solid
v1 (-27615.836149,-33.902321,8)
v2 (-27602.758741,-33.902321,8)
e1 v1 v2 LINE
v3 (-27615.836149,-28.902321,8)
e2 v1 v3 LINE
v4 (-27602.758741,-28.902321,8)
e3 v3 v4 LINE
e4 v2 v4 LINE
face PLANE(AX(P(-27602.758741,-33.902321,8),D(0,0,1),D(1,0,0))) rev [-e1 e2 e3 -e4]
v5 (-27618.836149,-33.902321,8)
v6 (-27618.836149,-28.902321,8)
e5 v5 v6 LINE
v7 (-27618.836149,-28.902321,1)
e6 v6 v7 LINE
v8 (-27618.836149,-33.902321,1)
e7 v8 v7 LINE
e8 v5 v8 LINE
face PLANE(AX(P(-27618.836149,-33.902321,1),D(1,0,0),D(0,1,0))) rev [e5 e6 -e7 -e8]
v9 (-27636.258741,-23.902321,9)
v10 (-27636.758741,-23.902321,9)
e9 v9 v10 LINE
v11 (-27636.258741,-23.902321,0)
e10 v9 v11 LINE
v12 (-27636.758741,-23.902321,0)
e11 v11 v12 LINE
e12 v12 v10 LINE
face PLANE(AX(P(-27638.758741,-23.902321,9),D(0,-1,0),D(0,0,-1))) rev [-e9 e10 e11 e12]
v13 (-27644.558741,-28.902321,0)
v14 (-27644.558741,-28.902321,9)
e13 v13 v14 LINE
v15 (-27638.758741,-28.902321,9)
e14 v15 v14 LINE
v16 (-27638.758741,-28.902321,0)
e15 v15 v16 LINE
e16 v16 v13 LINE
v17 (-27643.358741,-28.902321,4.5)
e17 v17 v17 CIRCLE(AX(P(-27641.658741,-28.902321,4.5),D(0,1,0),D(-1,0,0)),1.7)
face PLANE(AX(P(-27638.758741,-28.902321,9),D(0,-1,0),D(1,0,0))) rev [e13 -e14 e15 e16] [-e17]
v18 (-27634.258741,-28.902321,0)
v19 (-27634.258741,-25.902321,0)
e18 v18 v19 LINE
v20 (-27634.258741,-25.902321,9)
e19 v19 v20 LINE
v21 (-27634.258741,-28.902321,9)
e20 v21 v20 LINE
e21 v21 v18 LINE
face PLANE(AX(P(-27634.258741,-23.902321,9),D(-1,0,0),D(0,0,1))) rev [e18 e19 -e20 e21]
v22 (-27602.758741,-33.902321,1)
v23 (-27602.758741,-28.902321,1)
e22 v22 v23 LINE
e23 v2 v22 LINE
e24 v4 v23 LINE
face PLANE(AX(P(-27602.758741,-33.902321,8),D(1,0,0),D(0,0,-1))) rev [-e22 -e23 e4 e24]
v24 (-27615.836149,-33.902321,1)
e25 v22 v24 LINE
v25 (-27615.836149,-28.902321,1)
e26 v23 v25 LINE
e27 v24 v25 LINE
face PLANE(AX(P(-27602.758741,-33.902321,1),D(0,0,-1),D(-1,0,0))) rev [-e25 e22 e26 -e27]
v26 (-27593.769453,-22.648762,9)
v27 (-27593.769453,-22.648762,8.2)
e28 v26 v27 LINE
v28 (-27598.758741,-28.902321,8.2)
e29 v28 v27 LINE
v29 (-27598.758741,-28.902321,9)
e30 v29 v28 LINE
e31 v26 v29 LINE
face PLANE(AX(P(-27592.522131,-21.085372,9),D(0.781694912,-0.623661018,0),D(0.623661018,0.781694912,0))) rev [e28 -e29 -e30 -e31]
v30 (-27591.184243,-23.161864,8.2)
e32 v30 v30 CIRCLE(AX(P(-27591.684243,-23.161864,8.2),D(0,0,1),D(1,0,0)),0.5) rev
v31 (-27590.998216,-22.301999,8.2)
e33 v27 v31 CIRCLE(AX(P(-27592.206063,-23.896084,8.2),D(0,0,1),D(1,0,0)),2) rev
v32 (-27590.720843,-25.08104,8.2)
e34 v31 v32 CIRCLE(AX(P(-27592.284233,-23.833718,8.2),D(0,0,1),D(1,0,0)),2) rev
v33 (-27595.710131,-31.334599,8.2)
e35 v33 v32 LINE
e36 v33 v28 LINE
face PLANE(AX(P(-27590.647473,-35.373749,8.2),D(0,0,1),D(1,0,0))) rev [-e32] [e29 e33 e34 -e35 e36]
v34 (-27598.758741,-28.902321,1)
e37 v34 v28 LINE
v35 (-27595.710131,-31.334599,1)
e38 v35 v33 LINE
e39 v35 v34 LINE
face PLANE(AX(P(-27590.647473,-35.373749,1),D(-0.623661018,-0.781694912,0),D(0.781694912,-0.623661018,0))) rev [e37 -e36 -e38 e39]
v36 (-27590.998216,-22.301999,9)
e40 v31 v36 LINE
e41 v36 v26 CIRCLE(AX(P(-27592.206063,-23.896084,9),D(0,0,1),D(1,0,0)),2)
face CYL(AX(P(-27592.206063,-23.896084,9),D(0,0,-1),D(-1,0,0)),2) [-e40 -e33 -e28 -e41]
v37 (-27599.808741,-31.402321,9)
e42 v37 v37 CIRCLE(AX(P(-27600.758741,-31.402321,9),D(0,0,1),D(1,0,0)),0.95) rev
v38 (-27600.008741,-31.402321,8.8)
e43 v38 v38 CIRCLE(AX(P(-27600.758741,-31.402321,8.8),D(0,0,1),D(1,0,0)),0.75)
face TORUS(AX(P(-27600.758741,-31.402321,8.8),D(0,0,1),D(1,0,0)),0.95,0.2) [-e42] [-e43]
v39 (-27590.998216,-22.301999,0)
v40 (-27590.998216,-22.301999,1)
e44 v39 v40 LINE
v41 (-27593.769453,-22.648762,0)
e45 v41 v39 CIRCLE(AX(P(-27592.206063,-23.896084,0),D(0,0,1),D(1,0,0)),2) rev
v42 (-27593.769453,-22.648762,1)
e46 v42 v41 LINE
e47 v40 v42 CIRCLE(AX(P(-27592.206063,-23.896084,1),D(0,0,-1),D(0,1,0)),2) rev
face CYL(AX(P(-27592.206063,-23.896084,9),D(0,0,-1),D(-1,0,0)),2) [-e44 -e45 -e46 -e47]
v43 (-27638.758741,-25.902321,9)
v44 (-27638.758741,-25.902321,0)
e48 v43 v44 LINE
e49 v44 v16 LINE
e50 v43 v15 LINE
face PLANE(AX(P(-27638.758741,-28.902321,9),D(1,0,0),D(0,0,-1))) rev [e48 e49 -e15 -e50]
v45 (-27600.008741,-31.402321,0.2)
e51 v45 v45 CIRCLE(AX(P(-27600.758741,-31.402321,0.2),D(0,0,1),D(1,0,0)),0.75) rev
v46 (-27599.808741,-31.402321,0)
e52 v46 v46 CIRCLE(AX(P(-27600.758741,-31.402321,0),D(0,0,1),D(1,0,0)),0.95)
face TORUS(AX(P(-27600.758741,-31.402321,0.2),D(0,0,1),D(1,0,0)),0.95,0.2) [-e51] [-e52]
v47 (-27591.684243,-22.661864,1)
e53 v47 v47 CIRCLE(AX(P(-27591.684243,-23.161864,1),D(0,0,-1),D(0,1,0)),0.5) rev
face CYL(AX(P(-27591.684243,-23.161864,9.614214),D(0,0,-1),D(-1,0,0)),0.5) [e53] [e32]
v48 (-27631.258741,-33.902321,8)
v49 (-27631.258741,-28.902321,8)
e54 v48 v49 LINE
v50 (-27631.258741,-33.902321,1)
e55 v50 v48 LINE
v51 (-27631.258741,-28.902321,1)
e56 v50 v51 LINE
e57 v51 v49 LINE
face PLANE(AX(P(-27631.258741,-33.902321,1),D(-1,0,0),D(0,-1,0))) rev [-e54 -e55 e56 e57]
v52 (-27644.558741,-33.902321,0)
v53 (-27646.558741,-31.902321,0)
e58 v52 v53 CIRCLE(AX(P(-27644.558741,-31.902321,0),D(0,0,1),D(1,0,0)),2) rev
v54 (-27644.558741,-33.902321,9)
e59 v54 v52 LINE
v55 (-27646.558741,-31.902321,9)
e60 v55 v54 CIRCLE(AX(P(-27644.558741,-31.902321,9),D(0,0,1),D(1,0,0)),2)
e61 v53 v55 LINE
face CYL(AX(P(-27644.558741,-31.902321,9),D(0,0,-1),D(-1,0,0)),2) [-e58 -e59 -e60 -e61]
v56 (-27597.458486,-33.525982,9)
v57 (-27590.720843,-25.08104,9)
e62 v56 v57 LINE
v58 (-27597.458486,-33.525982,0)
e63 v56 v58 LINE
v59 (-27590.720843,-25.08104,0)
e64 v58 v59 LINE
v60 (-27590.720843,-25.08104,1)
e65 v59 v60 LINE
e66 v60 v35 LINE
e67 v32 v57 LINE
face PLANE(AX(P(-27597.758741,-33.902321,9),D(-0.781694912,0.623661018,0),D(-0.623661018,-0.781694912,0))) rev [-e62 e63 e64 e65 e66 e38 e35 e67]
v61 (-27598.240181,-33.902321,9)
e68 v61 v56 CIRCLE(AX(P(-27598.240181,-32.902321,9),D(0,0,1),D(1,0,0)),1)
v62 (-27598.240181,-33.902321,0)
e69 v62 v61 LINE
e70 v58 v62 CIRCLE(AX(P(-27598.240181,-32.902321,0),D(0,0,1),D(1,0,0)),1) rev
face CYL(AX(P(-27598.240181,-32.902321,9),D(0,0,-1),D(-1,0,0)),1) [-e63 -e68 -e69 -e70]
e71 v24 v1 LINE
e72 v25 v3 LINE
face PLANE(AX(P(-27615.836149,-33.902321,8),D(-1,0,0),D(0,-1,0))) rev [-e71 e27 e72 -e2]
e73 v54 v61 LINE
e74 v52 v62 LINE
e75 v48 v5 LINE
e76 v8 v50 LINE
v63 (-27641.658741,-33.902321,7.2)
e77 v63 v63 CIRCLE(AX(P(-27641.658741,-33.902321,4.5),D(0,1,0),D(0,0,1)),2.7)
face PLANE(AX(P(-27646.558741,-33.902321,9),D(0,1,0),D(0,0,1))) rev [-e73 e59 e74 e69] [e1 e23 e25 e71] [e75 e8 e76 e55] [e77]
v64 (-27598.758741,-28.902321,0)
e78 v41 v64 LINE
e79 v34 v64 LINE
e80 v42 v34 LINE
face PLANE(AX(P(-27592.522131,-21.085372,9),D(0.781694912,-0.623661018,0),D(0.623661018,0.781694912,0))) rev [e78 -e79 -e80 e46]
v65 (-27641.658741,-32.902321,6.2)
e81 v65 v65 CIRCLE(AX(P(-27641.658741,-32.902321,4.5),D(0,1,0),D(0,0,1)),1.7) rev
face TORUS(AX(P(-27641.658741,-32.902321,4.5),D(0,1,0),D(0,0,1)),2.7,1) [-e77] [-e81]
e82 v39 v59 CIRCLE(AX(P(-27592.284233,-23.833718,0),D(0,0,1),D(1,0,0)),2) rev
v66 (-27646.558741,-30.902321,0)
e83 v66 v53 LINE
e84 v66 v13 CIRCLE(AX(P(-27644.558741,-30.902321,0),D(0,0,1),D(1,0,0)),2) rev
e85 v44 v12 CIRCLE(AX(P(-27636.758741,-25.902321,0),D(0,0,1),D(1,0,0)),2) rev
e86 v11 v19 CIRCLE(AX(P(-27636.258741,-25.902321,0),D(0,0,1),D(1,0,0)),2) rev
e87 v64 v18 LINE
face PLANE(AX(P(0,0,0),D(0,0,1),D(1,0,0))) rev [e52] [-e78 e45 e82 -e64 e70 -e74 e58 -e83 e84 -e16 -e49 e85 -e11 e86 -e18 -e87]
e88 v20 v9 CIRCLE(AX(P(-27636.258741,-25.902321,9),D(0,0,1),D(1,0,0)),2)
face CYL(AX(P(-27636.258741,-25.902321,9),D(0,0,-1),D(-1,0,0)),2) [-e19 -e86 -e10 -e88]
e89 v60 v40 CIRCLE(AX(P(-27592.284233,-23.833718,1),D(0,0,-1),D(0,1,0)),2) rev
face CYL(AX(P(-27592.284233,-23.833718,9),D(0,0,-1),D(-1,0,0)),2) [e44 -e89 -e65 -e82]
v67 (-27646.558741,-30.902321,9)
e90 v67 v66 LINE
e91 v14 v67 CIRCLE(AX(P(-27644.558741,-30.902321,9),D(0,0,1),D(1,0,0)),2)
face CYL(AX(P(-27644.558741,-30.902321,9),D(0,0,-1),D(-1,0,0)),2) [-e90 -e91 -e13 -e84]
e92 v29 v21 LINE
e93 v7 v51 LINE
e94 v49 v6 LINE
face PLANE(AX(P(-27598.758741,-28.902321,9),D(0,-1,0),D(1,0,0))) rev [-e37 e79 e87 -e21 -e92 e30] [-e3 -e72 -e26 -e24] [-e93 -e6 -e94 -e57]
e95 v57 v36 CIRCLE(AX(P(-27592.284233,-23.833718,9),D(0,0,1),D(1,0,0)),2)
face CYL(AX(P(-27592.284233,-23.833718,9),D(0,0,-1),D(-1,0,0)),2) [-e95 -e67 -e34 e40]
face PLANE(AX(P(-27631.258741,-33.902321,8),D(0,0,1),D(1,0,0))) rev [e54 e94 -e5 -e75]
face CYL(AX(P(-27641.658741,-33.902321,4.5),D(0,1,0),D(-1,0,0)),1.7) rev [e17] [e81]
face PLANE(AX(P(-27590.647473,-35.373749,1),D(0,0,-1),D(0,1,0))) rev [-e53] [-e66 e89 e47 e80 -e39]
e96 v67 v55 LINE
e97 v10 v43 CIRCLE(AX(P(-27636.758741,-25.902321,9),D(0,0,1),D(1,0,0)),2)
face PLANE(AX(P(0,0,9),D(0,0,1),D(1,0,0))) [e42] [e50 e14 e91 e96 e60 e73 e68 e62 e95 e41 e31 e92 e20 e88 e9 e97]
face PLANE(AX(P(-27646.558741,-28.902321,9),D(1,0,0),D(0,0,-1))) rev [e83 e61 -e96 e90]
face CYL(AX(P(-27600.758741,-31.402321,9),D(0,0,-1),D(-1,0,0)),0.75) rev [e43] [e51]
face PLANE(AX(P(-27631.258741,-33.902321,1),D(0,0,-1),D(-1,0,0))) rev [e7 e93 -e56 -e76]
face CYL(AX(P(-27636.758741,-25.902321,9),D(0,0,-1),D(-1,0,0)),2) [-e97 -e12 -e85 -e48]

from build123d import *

# Parameters (mm, degrees)
SZKIC1_R                    = 0.75
DODANIE_WYCI_GNI_CIE1_DEPTH = 9
ZAOKR_GLENIE1_R             = 2
ZAOKR_GLENIE3_R             = 1
SZKIC2_R                    = 1.7
WYTNIJ_WYCI_GNI_CIE1_DEPTH  = 27647.561311418
SZKIC3_W                    = 13.077407628
SZKIC3_H                    = 7
SZKIC3_W_2                  = 12.422592372
WYTNIJ_WYCI_GNI_CIE2_DEPTH  = 27647.561311418
SZKIC4_W                    = 7.2
SZKIC4_H                    = 12.770373744
WYTNIJ_WYCI_GNI_CIE3_DEPTH  = 17269.61853488
ZAOKR_GLENIE4_R             = 2
ZAOKR_GLENIE5_R             = 1
ZAOKR_GLENIE7_R             = 0.2
DODANIE_WYCI_GNI_CIE3_DEPTH = 7.2


with BuildPart() as part:
    # Szkic1 → Dodanie-wyciągnięcie1 (new body)
    with BuildSketch(Plane.XY):
        Polygon((-27646.558741393, -28.902320952), (-27646.558741393, -33.902320952), (-27597.758741393, -33.902320952), (-27589.47352106, -23.517649804), (-27592.522131216, -21.085371835), (-27598.758741393, -28.902320952), (-27634.258741393, -28.902320952), (-27634.258741393, -23.902320952), (-27638.758741393, -23.902320952), (-27638.758741393, -28.902320952), align=None)
        with Locations((-27600.758741393, -31.402320952)):
            Circle(SZKIC1_R, mode=Mode.SUBTRACT)
    extrude(amount=DODANIE_WYCI_GNI_CIE1_DEPTH)

    # Zaokrąglenie1
    zaokr_glenie1_edges = [part.edges().sort_by_distance(p)[0] for p in [
        (-27638.758741393, -23.902320952, 4.5),
        (-27634.258741393, -23.902320952, 4.5),
        (-27646.558741393, -33.902320952, 4.5),
        (-27646.558741393, -28.902320952, 4.5),
    ]]
    fillet(zaokr_glenie1_edges, radius=ZAOKR_GLENIE1_R)

    # Zaokrąglenie3
    zaokr_glenie3_edges = [part.edges().sort_by_distance(p)[0] for p in [
        (-27597.758741393, -33.902320952, 4.5),
    ]]
    fillet(zaokr_glenie3_edges, radius=ZAOKR_GLENIE3_R)

    # Szkic2 → Wytnij-wyciągnięcie1 (cut, through all)
    with BuildSketch(Plane(origin=(0, -28.902320952, 0), x_dir=(1, 0, 0), z_dir=(0, 1, 0))):
        with Locations(Location((-27641.658741393, -4.5, 0), (0, 0, 180))):
            Circle(SZKIC2_R)
    extrude(amount=-WYTNIJ_WYCI_GNI_CIE1_DEPTH, mode=Mode.SUBTRACT)

    # Szkic3 → Wytnij-wyciągnięcie2 (cut, through all)
    with BuildSketch(Plane(origin=(0, -28.902320952, 0), x_dir=(1, 0, 0), z_dir=(0, 1, 0))):
        with Locations((-27609.297445207, -4.5)):
            Rectangle(SZKIC3_W, SZKIC3_H)
        with Locations((-27625.047445207, -4.5)):
            Rectangle(SZKIC3_W_2, SZKIC3_H)
    extrude(amount=-WYTNIJ_WYCI_GNI_CIE2_DEPTH, mode=Mode.SUBTRACT)

    # Szkic4 → Wytnij-wyciągnięcie3 (cut, through all)
    with BuildSketch(Plane(origin=(-16850.04669364, 13443.502203136, 0), x_dir=(0, 0, 1), z_dir=(-0.7816949117558672, 0.6236610176490005, 0))):
        with Locations((4.6, -17228.477572842)):
            Rectangle(SZKIC4_W, SZKIC4_H)
    extrude(amount=-WYTNIJ_WYCI_GNI_CIE3_DEPTH, mode=Mode.SUBTRACT)

    # Zaokrąglenie4
    # the kernel refuses this fillet: 2 mm, written as the material it takes off along each edge
    with BuildSketch(Plane(origin=(-27589.47352106, -23.517649804, -5), x_dir=(-0.6236610176488676, -0.7816949117559733, 0), z_dir=(0, 0, 1)), Plane(origin=(-27592.522131216, -21.085371835, -5), x_dir=(0.78169491175572, -0.623661017649185, 0), z_dir=(0, 0, 1))) as zaokr_glenie4_piece_1:
        with BuildLine():
            CenterArc((ZAOKR_GLENIE4_R, -ZAOKR_GLENIE4_R), ZAOKR_GLENIE4_R, 90, 90)
            Line((0, -ZAOKR_GLENIE4_R), (0, 0))
            Line((0, 0), (ZAOKR_GLENIE4_R, 0))
        make_face()
    extrude(amount=11, mode=Mode.SUBTRACT)
    with BuildSketch(Plane(origin=(-27589.47352106, -23.517649804, 3.2), x_dir=(-0.6236610176488676, -0.7816949117559733, 0), z_dir=(0, 0, 1)), Plane(origin=(-27592.522131216, -21.085371835, 3.2), x_dir=(0.78169491175572, -0.623661017649185, 0), z_dir=(0, 0, 1))) as zaokr_glenie4_piece_2:
        with BuildLine():
            CenterArc((ZAOKR_GLENIE4_R, -ZAOKR_GLENIE4_R), ZAOKR_GLENIE4_R, 90, 90)
            Line((0, -ZAOKR_GLENIE4_R), (0, 0))
            Line((0, 0), (ZAOKR_GLENIE4_R, 0))
        make_face()
    extrude(amount=10.8, mode=Mode.SUBTRACT)

    # Zaokrąglenie5
    zaokr_glenie5_edges = [part.edges().sort_by_distance(p)[0] for p in [
        (-27639.958741393, -33.902320952, 4.5),
    ]]
    fillet(zaokr_glenie5_edges, radius=ZAOKR_GLENIE5_R)

    # Zaokrąglenie7
    zaokr_glenie7_edges = [part.edges().sort_by_distance(p)[0] for p in [
        (-27601.508741393, -31.402320952, 0),
        (-27601.508741393, -31.402320952, 9),
    ]]
    fillet(zaokr_glenie7_edges, radius=ZAOKR_GLENIE7_R)

    # Szkic6 → Dodanie-wyciągnięcie3 (add)
    with BuildSketch(Plane.XY.offset(1)):
        with BuildLine():
            ThreePointArc((-27591.372412611, -22.771016391), (-27592.075090576, -22.850033338), (-27591.996073629, -23.552711303))
            Line((-27591.996073629, -23.552711303), (-27591.372412611, -22.771016391))
        make_face()
        with BuildLine():
            Line((-27591.372412611, -22.771016391), (-27591.996073629, -23.552711303))
            ThreePointArc((-27591.996073629, -23.552711303), (-27591.467350583, -23.612372035), (-27591.18424312, -23.161863847))
            ThreePointArc((-27591.18424312, -23.161863847), (-27591.233734932, -22.944971309), (-27591.372412611, -22.771016391))
        make_face()
    extrude(amount=DODANIE_WYCI_GNI_CIE3_DEPTH)


solid = part.part
